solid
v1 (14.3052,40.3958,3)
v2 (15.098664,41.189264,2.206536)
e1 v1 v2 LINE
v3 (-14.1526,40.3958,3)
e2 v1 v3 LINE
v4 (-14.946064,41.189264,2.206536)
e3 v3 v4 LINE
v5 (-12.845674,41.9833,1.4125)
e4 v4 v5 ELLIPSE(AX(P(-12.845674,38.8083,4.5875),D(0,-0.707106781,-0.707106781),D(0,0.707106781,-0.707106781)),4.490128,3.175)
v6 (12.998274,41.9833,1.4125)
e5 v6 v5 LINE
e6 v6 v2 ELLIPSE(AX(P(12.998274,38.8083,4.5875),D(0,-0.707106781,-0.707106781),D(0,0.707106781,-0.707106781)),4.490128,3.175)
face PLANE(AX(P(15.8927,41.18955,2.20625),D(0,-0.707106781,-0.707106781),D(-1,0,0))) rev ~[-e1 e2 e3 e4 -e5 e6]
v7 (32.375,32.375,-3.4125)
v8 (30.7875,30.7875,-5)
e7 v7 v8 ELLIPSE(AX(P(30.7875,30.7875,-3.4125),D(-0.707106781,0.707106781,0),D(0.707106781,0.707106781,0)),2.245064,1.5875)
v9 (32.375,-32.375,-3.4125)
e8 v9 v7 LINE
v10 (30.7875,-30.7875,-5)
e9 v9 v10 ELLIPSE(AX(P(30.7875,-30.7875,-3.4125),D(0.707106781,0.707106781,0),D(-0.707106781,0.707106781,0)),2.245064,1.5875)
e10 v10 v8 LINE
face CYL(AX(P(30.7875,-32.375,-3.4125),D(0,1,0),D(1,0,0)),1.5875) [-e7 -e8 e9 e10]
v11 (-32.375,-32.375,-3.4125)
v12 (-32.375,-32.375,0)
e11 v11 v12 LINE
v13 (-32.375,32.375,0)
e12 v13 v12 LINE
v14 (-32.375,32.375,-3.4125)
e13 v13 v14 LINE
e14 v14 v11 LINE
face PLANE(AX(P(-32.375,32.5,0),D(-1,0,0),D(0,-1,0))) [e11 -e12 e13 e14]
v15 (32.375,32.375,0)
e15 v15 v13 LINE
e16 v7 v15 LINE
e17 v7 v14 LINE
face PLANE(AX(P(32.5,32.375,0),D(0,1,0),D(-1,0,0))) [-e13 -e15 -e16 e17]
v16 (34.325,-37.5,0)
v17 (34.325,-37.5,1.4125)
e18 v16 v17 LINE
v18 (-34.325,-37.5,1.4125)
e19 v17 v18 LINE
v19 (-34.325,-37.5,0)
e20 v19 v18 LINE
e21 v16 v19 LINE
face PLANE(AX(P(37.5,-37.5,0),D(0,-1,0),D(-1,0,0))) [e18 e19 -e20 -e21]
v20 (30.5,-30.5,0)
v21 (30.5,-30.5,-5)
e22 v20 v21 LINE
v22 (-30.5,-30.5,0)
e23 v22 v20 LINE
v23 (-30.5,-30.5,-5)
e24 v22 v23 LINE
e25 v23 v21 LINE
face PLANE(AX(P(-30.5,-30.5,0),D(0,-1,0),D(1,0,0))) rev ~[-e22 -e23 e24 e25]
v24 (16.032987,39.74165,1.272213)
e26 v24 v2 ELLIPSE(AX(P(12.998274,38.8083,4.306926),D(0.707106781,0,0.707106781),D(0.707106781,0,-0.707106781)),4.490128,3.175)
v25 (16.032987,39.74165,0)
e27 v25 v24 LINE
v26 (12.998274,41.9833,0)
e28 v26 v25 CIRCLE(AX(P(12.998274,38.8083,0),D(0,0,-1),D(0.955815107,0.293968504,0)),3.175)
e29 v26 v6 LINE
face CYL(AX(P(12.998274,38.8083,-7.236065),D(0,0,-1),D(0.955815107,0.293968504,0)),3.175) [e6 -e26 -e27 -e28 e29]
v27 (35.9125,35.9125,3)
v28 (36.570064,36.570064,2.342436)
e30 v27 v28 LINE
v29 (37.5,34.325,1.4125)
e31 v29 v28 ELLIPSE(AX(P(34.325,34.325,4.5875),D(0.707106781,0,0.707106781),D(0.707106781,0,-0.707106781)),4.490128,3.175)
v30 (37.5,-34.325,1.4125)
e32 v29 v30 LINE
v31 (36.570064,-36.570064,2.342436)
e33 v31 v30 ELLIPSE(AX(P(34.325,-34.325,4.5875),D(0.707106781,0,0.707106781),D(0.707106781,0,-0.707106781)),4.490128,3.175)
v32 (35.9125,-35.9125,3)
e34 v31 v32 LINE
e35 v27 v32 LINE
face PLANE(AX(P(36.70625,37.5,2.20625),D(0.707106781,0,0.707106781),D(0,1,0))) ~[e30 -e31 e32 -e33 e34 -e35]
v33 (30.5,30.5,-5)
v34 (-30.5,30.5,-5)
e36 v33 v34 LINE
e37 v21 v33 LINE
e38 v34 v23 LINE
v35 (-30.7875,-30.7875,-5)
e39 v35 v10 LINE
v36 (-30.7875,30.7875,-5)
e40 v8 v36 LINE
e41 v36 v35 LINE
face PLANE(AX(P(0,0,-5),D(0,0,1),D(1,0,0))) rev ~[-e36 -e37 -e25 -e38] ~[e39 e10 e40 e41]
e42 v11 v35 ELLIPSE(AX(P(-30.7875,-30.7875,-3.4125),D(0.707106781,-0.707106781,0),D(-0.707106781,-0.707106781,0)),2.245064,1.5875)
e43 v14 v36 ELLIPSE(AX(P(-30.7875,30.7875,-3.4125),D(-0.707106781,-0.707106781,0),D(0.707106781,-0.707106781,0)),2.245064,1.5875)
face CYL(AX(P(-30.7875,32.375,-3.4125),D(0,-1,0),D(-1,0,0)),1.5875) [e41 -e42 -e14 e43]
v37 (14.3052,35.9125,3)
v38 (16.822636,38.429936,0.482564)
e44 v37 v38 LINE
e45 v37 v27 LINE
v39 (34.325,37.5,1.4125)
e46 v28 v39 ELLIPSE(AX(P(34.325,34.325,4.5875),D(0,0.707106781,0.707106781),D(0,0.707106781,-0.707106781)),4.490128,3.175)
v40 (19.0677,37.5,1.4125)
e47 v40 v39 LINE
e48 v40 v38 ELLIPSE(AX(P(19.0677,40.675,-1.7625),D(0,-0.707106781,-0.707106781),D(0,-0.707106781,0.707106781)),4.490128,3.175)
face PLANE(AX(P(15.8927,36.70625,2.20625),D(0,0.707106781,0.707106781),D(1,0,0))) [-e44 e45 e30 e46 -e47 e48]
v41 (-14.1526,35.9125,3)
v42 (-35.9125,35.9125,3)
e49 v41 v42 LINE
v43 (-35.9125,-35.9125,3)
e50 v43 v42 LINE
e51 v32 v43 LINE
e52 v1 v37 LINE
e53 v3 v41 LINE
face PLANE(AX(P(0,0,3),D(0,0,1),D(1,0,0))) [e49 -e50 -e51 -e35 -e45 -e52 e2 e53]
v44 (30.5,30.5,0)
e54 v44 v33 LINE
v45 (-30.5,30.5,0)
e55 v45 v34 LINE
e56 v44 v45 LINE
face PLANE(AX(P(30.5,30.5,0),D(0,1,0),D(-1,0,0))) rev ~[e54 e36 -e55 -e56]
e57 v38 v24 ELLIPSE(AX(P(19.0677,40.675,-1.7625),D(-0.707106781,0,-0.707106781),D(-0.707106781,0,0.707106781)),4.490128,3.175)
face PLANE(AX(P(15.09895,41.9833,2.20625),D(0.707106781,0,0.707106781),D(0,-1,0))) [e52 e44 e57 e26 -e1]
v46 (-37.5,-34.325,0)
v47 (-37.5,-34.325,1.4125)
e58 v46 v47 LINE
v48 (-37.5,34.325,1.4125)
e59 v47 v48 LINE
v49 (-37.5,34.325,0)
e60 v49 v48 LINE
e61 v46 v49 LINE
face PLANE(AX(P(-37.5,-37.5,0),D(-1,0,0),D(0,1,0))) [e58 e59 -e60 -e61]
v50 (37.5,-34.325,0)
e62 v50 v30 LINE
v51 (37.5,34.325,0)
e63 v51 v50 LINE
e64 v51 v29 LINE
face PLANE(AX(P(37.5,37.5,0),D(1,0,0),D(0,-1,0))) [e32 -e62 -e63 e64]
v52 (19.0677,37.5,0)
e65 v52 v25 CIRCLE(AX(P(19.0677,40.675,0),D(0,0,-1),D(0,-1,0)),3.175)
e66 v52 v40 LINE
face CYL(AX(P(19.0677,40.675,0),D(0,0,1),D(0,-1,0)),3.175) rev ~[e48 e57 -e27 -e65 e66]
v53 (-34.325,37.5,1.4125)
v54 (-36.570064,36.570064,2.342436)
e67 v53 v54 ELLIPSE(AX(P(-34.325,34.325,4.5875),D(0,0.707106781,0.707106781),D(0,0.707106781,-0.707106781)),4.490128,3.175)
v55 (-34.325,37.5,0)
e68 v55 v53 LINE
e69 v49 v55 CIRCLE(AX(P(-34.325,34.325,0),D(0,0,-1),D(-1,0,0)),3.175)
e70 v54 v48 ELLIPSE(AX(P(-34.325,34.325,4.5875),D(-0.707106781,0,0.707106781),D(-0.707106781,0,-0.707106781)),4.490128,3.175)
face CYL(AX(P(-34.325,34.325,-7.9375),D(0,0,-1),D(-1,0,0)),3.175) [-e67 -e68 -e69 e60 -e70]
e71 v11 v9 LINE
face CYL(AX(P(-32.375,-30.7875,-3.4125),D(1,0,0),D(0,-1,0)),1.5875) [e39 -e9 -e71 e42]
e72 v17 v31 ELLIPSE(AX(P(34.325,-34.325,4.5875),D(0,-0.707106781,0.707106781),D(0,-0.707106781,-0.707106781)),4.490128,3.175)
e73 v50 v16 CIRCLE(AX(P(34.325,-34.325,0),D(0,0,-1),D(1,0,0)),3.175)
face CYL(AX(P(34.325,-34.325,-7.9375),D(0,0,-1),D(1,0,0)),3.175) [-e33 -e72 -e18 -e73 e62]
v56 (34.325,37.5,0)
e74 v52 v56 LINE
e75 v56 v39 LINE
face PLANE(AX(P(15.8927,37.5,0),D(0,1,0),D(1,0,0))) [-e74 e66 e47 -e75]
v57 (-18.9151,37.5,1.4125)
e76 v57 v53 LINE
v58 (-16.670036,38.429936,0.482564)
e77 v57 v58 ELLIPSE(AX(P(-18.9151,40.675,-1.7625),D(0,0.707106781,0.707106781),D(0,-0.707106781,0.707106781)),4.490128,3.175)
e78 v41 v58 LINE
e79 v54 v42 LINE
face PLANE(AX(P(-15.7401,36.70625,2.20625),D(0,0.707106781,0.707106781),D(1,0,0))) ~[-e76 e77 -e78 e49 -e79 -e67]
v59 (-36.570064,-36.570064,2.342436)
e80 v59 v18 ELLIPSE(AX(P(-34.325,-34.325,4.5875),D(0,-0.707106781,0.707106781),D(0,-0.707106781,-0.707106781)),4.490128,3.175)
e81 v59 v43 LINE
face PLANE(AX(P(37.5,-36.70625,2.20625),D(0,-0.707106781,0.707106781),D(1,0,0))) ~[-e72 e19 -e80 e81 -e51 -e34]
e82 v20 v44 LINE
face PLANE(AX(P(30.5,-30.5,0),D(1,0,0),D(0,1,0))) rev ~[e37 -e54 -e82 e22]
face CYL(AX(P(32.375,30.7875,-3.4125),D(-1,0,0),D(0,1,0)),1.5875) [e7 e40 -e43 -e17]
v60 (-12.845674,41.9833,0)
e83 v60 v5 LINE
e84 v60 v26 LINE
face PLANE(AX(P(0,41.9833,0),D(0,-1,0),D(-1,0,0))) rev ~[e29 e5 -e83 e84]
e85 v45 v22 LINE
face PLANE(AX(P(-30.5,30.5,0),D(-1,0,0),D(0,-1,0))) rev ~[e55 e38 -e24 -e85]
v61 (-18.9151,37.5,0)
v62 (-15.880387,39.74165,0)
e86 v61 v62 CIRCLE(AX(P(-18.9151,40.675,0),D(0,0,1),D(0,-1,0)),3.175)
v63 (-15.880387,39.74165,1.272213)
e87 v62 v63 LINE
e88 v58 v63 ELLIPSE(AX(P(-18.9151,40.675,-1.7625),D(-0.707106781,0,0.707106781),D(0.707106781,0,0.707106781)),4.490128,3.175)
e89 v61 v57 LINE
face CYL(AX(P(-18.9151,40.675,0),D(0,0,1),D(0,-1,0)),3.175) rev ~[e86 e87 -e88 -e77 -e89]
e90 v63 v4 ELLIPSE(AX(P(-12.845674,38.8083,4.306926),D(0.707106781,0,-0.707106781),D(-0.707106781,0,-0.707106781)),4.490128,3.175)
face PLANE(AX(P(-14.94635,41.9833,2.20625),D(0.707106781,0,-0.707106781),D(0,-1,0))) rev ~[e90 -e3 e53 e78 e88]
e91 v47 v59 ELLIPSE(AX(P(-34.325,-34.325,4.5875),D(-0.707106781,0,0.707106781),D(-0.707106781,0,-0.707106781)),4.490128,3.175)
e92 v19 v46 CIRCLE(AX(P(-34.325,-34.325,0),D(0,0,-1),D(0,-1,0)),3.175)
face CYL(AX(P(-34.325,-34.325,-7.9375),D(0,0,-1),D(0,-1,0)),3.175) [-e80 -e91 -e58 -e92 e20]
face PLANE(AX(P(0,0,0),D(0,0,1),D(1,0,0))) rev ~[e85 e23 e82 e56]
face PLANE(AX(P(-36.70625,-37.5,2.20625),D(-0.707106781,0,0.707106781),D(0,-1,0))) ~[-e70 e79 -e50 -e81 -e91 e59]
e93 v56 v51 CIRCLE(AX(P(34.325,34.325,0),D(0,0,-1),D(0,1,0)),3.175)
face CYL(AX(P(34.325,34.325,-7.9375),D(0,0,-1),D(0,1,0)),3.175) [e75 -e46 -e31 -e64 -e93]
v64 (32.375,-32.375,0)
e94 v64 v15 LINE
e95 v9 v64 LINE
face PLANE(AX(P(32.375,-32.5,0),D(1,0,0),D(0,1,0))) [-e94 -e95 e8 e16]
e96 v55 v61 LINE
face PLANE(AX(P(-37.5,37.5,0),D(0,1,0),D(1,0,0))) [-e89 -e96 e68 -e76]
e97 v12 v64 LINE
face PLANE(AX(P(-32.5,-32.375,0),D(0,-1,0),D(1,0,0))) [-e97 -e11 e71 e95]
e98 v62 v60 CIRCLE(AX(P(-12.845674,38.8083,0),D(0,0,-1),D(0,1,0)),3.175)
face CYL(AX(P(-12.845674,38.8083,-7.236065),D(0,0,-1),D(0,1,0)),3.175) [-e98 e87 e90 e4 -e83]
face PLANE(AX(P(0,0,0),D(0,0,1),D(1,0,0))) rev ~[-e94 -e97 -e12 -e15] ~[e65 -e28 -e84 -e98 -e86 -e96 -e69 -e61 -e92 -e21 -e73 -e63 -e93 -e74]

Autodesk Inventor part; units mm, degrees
ref_plane "YZ Plane" through (0, 0, 0) normal (1, 0, 0) x (0, 1, 0)
ref_plane "XZ Plane" through (0, 0, 0) normal (0, 1, 0) x (-1, 0, 0)
ref_plane "XY Plane" through (0, 0, 0) normal (0, 0, 1) x (1, 0, 0)
sketch "Sketch1" plane through (0, 0, 0) normal (0, 0, 1) x (1, 0, 0)
  line L0 (37.5, -37.5) -> (-37.5, -37.5)
  line L1 (-37.5, -37.5) -> (-37.5, 37.5)
  line L2 (-37.5, 37.5) -> (37.5, 37.5)
  line L3 (37.5, 37.5) -> (37.5, -37.5)
  line L4 (37.5, -37.5) -> (-37.5, 37.5) construction
  line L5 (-37.5, -37.5) -> (37.5, 37.5) construction
  line L6 (32.5, 32.5) -> (-32.5, 32.5)
  line L7 (-32.5, 32.5) -> (-32.5, -32.5)
  line L8 (-32.5, -32.5) -> (32.5, -32.5)
  line L9 (32.5, -32.5) -> (32.5, 32.5)
  line L10 (32.5, 32.5) -> (-32.5, -32.5) construction
  line L11 (-32.5, 32.5) -> (32.5, -32.5) construction
  line L12 (30.5, 30.5) -> (-30.5, 30.5)
  line L13 (-30.5, 30.5) -> (-30.5, -30.5)
  line L14 (-30.5, -30.5) -> (30.5, -30.5)
  line L15 (30.5, -30.5) -> (30.5, 30.5)
  line L16 (30.5, 30.5) -> (-30.5, -30.5) construction
  line L17 (-30.5, 30.5) -> (30.5, -30.5) construction
  line L18 (-4.8636, 37.5) -> (-36.3868, 37.5)
  line L19 (0, 41.9833) -> (-15.7401, 41.9833)
  line L20 (-15.7401, 41.9833) -> (-15.7401, 37.5)
  line L21 (0, 41.9833) -> (15.8927, 41.9833)
  line L22 (15.8927, 41.9833) -> (15.8927, 37.5)
  point P0 (0, 0)
  dimension "d2" = 65
  dimension "d3" = 65
  dimension "d4" = 2
  dimension "d5" = 2
  dimension "d22" = 5
  dimension "d23" = 5
extrude "Extrusion1" add sketch "Sketch1" along normal blind 3 contours L0 L1 L2 L3 | L2 L20 L19 L21 L22 | L9 L8 L7 L6 | L15 L14 L13 L12
extrude "Extrusion2" add sketch "Sketch1" against normal blind 5 contours L9 L8 L7 L6
chamfer "Chamfer1" distance 1.5875 angle 45 8 edges at (0, -37.5, 3) (-37.5, 0, 3) (26.6963, 37.5, 3) (-26.62, 37.5, 3) (37.5, 0, 3) (15.8927, 39.7416, 3) (0.0763, 41.9833, 3) (-15.7401, 39.7416, 3)
fillet "Fillet2" radius 3.175 8 edges at (-37.5, -37.5, 0.7063) (37.5, -37.5, 0.7063) (37.5, 37.5, 0.7063) (-37.5, 37.5, 0.7063) (15.8927, 37.5, 0.7063) (15.8927, 41.9833, 0.7063) (-15.7401, 41.9833, 0.7063) (-15.7401, 37.5, 0.7063)
thicken "Thicken1" operation cut thickness 0.125 both sides no extend neighbours no toward (1, 0, 0) faces at (-32.5, 10.8333, -3.3333) (-10.8333, -32.5, -3.3333) (32.5, -10.8333, -3.3333) (10.8333, 32.5, -3.3333)
fillet "Fillet3" radius 1.5875 4 edges at (32.375, 0, -5) (-32.375, 0, -5) (0, 32.375, -5) (0, -32.375, -5)
properties part number "Lid" material "PET Plastic"
